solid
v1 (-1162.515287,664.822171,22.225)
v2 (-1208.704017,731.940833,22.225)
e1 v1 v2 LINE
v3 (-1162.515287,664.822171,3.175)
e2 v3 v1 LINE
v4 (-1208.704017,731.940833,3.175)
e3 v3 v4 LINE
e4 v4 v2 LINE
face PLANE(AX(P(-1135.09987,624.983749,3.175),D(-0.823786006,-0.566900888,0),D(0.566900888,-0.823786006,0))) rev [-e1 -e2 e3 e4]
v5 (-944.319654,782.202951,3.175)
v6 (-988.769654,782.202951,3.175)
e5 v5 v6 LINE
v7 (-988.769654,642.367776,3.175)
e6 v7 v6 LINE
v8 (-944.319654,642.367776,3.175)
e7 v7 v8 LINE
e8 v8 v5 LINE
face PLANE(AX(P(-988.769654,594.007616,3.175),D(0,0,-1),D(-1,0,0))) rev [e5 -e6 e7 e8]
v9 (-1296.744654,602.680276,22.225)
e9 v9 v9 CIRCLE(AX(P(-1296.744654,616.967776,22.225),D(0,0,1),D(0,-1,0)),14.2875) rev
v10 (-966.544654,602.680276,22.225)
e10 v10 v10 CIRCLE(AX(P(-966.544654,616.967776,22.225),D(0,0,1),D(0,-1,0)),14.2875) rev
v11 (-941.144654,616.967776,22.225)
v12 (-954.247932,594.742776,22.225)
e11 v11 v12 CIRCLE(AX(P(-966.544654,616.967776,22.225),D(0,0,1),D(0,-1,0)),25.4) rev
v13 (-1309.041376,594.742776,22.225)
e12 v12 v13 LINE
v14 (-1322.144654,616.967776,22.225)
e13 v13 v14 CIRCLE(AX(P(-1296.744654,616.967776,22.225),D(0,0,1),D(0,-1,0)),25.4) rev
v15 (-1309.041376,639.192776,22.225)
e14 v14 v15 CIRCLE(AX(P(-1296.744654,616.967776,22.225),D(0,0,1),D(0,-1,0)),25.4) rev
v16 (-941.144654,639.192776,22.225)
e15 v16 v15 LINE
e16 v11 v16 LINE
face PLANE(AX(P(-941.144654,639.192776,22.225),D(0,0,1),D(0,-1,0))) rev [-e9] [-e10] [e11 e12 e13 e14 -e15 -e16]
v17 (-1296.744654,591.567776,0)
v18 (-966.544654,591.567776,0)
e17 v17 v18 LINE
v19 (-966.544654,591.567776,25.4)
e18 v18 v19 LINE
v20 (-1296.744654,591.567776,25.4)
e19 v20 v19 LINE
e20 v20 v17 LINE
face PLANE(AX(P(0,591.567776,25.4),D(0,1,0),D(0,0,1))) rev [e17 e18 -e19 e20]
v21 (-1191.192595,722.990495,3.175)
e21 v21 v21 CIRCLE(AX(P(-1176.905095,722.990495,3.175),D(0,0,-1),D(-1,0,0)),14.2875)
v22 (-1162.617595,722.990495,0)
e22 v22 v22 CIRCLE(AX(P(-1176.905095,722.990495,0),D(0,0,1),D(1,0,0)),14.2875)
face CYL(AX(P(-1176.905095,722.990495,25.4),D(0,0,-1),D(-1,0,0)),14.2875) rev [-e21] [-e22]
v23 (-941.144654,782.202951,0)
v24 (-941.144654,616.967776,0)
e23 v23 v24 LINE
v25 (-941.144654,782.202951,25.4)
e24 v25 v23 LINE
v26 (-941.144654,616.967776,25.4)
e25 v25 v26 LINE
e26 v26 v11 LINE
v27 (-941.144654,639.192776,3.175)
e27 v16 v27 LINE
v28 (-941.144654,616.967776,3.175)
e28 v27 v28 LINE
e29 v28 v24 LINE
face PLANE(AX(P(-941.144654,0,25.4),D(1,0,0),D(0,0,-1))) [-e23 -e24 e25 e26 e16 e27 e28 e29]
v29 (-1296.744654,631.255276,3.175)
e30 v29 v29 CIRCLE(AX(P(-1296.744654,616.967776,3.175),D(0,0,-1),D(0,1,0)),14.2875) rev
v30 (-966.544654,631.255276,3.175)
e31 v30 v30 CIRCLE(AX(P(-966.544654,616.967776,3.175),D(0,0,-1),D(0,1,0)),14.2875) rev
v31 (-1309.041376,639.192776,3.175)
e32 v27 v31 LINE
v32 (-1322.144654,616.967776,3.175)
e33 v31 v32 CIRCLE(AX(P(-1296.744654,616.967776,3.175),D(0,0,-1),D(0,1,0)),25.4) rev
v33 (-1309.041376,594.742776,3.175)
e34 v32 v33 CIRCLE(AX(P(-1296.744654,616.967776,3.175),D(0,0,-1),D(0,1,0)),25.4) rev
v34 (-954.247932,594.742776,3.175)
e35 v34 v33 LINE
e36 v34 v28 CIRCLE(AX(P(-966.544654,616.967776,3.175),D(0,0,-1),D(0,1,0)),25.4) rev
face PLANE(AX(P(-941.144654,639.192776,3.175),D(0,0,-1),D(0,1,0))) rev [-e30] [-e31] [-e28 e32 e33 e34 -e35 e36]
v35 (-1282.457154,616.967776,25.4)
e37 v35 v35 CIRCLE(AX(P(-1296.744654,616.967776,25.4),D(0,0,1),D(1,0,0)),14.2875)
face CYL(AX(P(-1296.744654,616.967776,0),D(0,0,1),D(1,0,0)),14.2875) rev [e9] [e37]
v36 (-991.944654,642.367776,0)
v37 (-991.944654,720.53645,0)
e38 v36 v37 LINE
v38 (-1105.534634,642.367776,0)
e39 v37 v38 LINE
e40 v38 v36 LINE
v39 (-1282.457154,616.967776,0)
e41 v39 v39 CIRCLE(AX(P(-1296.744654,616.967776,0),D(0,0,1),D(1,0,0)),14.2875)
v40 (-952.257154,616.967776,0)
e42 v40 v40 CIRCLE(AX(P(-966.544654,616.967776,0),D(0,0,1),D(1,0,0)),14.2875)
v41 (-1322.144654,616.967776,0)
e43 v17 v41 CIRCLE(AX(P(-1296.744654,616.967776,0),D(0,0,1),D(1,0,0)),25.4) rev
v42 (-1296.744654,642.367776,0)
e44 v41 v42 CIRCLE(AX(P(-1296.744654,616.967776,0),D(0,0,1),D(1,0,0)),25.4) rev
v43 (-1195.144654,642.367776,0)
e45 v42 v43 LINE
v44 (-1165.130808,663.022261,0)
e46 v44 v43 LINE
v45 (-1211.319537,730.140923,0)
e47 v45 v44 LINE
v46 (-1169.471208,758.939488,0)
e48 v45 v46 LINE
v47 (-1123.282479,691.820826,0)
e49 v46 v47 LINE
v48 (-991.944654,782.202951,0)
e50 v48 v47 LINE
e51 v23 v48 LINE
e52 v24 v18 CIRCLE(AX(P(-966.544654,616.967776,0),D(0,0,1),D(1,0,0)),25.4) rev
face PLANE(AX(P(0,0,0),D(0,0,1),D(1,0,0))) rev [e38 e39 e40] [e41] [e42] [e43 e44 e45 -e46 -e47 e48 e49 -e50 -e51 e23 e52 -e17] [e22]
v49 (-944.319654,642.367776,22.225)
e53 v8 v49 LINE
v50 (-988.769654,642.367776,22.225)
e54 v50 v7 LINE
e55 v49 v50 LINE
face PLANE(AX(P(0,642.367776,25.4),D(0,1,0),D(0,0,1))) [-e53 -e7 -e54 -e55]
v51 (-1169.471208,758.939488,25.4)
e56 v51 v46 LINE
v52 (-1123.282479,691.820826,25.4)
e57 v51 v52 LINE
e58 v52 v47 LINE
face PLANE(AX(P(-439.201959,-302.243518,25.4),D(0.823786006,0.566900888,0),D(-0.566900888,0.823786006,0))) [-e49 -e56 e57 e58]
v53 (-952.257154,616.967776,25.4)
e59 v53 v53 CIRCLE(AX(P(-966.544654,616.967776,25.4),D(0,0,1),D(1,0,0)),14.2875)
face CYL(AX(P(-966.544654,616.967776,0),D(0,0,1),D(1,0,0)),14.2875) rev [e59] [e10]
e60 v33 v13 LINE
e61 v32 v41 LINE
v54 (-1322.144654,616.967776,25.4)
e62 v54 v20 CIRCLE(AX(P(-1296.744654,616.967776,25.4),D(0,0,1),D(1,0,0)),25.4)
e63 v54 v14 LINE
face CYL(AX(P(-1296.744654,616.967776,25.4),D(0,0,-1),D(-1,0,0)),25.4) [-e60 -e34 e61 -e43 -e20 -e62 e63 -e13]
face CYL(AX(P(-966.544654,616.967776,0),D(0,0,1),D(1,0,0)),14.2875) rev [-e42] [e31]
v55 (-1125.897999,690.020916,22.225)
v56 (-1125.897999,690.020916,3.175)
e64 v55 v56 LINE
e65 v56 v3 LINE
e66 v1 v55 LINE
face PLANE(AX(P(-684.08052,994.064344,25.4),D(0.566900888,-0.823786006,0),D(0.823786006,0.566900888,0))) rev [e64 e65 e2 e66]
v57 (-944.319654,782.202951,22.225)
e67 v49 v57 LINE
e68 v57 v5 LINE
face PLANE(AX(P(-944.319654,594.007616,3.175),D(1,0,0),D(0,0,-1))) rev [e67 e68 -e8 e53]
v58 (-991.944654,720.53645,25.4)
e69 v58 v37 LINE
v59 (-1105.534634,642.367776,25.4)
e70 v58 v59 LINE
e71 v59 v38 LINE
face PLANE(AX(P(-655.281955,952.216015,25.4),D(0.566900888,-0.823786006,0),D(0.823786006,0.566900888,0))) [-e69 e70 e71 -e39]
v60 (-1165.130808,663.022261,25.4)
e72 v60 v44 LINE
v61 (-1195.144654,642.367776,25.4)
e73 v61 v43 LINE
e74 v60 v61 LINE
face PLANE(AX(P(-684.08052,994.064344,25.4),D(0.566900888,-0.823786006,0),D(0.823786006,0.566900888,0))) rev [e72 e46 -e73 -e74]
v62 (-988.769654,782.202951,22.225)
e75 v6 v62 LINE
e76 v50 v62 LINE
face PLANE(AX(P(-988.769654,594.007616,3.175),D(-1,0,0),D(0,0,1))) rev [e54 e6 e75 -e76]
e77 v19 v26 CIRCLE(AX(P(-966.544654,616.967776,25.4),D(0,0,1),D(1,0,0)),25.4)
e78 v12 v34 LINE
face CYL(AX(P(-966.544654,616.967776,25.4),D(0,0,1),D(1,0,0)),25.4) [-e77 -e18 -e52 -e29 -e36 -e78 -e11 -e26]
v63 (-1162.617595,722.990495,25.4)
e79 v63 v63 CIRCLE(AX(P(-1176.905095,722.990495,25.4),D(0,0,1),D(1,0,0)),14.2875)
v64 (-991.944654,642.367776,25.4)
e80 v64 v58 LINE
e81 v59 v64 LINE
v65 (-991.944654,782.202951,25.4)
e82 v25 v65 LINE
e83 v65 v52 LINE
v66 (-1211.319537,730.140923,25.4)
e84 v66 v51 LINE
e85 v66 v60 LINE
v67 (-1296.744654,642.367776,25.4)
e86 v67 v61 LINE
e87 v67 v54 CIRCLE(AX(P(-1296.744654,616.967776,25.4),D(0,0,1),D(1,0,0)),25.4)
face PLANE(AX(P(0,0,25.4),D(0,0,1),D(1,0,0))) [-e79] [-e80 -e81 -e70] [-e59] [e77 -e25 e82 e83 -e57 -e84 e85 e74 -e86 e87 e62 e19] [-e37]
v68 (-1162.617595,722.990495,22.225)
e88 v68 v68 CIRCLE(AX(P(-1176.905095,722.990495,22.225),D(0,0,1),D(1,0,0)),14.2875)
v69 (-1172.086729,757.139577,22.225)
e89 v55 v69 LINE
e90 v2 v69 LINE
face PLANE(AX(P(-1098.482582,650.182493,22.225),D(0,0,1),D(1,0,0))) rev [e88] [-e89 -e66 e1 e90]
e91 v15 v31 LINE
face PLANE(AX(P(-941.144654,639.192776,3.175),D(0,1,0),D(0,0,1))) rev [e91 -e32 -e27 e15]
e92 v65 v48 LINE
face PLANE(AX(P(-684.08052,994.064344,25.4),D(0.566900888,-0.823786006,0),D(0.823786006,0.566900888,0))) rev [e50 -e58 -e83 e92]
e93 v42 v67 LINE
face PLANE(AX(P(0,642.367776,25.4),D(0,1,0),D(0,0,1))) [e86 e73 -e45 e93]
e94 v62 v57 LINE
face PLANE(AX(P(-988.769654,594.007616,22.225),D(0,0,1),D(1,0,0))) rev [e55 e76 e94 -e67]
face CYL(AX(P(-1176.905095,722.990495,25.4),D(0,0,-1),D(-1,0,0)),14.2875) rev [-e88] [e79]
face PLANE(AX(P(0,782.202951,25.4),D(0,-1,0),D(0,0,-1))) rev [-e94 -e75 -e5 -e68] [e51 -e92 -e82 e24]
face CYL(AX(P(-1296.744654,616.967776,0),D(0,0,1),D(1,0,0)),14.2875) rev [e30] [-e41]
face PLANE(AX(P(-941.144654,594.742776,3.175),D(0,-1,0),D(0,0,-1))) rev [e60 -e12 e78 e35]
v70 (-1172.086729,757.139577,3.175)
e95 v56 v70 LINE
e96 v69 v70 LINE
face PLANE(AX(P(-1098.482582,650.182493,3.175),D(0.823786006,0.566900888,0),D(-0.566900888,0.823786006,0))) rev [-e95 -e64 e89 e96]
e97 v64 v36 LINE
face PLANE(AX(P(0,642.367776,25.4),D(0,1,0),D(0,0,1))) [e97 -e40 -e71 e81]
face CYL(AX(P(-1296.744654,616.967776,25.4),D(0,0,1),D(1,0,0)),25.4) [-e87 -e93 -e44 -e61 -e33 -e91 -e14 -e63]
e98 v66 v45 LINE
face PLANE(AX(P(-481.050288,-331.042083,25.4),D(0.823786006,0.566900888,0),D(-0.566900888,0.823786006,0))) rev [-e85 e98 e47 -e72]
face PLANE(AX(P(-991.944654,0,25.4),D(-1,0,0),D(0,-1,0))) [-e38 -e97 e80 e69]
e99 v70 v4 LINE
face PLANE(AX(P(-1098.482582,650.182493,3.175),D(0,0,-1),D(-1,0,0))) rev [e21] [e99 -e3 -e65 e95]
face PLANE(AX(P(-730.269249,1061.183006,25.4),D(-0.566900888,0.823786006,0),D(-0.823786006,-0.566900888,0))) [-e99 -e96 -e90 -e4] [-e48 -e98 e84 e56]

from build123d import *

# Parameters (mm, degrees)
SKETCH1_R           = 14.2875
SKETCH1_R_2         = 25.4
BOSS_EXTRUDE3_DEPTH = 25.4
SKETCH9_R           = 14.2875
CUT_EXTRUDE7_DEPTH  = 1537.409158581
SKETCH10_W          = 19.05
SKETCH10_H          = 44.45
CUT_EXTRUDE8_DEPTH  = 871.429558372
SKETCH11_W          = 44.45
SKETCH11_H          = 19.05
CUT_EXTRUDE9_DEPTH  = 139.835175171
SKETCH13_R          = 14.2875
BOSS_EXTRUDE4_DEPTH = 25.4
SKETCH14_W          = 44.45
SKETCH14_H          = 19.05
CUT_EXTRUDE10_DEPTH = 81.475845846
FILLET3_R           = 25.4


with BuildPart() as part:
    # Sketch1 → Boss-Extrude3 (new body)
    # profile 1 of 13: a face of its own
    with BuildSketch(Plane.XY):
        with BuildLine():
            ThreePointArc((-1322.144654144, 616.967775532), (-1314.705166386, 634.928287774), (-1296.744654144, 642.367775532))
            Line((-1296.744654144, 642.367775532), (-1322.144654144, 642.367775532))
            Line((-1322.144654144, 642.367775532), (-1322.144654144, 616.967775532))
        make_face()
    # profile 2 of 13: a face of its own
    with BuildSketch(Plane.XY):
        with BuildLine():
            ThreePointArc((-1296.744654144, 591.567775532), (-1314.705166386, 599.00726329), (-1322.144654144, 616.967775532))
            Line((-1322.144654144, 616.967775532), (-1322.144654144, 591.567775532))
            Line((-1322.144654144, 591.567775532), (-1296.744654144, 591.567775532))
        make_face()
    # profile 3 of 13: a face of its own
    with BuildSketch(Plane.XY):
        with BuildLine():
            ThreePointArc((-1258.644654144, 616.967775532), (-1261.152687268, 630.562697152), (-1268.34659083, 642.367775532))
            Line((-1268.34659083, 642.367775532), (-1296.744654144, 642.367775532))
            ThreePointArc((-1296.744654144, 642.367775532), (-1278.784141902, 634.928287774), (-1271.344654144, 616.967775532))
            ThreePointArc((-1271.344654144, 616.967775532), (-1278.784141902, 599.00726329), (-1296.744654144, 591.567775532))
            Line((-1296.744654144, 591.567775532), (-1268.34659083, 591.567775532))
            ThreePointArc((-1268.34659083, 591.567775532), (-1261.152687268, 603.372853911), (-1258.644654144, 616.967775532))
        make_face()
    # profile 4 of 13: a face of its own
    with BuildSketch(Plane.XY):
        with BuildLine():
            Line((-1166.346089039, 600.519446439), (-1195.144654144, 642.367775532))
            Line((-1195.144654144, 642.367775532), (-1268.34659083, 642.367775532))
            ThreePointArc((-1268.34659083, 642.367775532), (-1261.152687268, 630.562697152), (-1258.644654144, 616.967775532))
            ThreePointArc((-1258.644654144, 616.967775532), (-1261.152687268, 603.372853911), (-1268.34659083, 591.567775532))
            Line((-1268.34659083, 591.567775532), (-1128.284013271, 591.567775532))
            Line((-1128.284013271, 591.567775532), (-1128.284013271, 626.712443646))
            Line((-1128.284013271, 626.712443646), (-1166.346089039, 600.519446439))
        make_face()
    # profile 5 of 13: a face of its own
    with BuildSketch(Plane.XY):
        Polygon((-1128.284013271, 642.367775532), (-1195.144654144, 642.367775532), (-1166.346089039, 600.519446439), (-1128.284013271, 626.712443646), align=None)
    # profile 6 of 13: a face of its own
    with BuildSketch(Plane.XY):
        Polygon((-991.944654144, 720.536450369), (-991.944654144, 782.202950703), (-1195.144654144, 642.367775532), (-1128.284013271, 642.367775532), (-1105.534633972, 642.367775532), align=None)
    # profile 7 of 13: a face of its own
    with BuildSketch(Plane.XY):
        Polygon((-1105.534633972, 642.367775532), (-1128.284013271, 642.367775532), (-1128.284013271, 626.712443646), align=None)
    # profile 8 of 13: a face of its own
    with BuildSketch(Plane.XY):
        Polygon((-941.144654144, 591.567775532), (-941.144654144, 642.367775532), (-991.944654144, 642.367775532), (-1105.534633972, 642.367775532), (-1128.284013271, 626.712443646), (-1128.284013271, 591.567775532), align=None)
        with Locations((-966.544654144, 616.967775532)):
            Circle(SKETCH1_R, mode=Mode.SUBTRACT)
    # profile 9 of 13: a face of its own
    with BuildSketch(Plane.XY):
        Polygon((-941.144654144, 782.202950703), (-991.944654144, 782.202950703), (-963.146089039, 740.354621609), (-991.944654144, 720.536450369), (-991.944654144, 642.367775532), (-941.144654144, 642.367775532), align=None)
    # profile 10 of 13: a face of its own
    with BuildSketch(Plane.XY):
        Polygon((-963.146089039, 740.354621609), (-991.944654144, 782.202950703), (-991.944654144, 720.536450369), align=None)
    # profile 11 of 13: a face of its own
    with BuildSketch(Plane.XY):
        with Locations((-966.544654144, 616.967775532)):
            Circle(SKETCH1_R)
    # profile 12 of 13: a face of its own
    with BuildSketch(Plane.XY):
        with Locations((-1296.744654144, 616.967775532)):
            Circle(SKETCH1_R_2)
        with Locations((-1296.744654144, 616.967775532)):
            Circle(SKETCH1_R, mode=Mode.SUBTRACT)
    # profile 13 of 13: a face of its own
    with BuildSketch(Plane.XY):
        with Locations((-1296.744654144, 616.967775532)):
            Circle(SKETCH1_R)
    extrude(amount=BOSS_EXTRUDE3_DEPTH)

    # Sketch9 → Cut-Extrude7 (cut, through all)
    with BuildSketch(Plane.XY.offset(25.4)):
        with Locations((-1296.744654144, 616.967775532)):
            Circle(SKETCH9_R)
        with Locations((-966.544654144, 616.967775532)):
            Circle(SKETCH9_R)
    extrude(amount=-CUT_EXTRUDE7_DEPTH, mode=Mode.SUBTRACT)

    # Sketch10 → Cut-Extrude8 (cut, through all)
    with BuildSketch(Plane.ZY.offset(1322.144654144)):
        with Locations((12.7, 616.967775532)):
            Rectangle(SKETCH10_W, SKETCH10_H)
    extrude(amount=-CUT_EXTRUDE8_DEPTH, mode=Mode.SUBTRACT)

    # Sketch11 → Cut-Extrude9 (cut)
    with BuildSketch(Plane(origin=(0, 782.202950703, 0), x_dir=(1, 0, 0), z_dir=(0, 1, 0))):
        with Locations((-966.544654144, -12.7)):
            Rectangle(SKETCH11_W, SKETCH11_H)
    extrude(amount=-CUT_EXTRUDE9_DEPTH, mode=Mode.SUBTRACT)

    # Sketch13 → Boss-Extrude4 (add)
    # profile 1 of 2: a face of its own
    with BuildSketch(Plane.XY):
        with BuildLine():
            Line((-1169.471208218, 758.939487681), (-1211.319537311, 730.140922576))
            Line((-1211.319537311, 730.140922576), (-1180.283016907, 685.040532503))
            ThreePointArc((-1180.283016907, 685.040532503), (-1154.1022052, 692.46774594), (-1139.555223473, 715.467392104))
            Line((-1139.555223473, 715.467392104), (-1169.471208218, 758.939487681))
        make_face()
        with Locations((-1176.905095286, 722.990494894)):
            Circle(SKETCH13_R, mode=Mode.SUBTRACT)
    # profile 2 of 2: a face of its own
    with BuildSketch(Plane.XY):
        with BuildLine():
            ThreePointArc((-1139.555223473, 715.467392104), (-1154.1022052, 692.46774594), (-1180.283016907, 685.040532503))
            Line((-1180.283016907, 685.040532503), (-1165.130807959, 663.022260959))
            Line((-1165.130807959, 663.022260959), (-1123.282478866, 691.820826065))
            Line((-1123.282478866, 691.820826065), (-1139.555223473, 715.467392104))
        make_face()
    extrude(amount=BOSS_EXTRUDE4_DEPTH)

    # Sketch14 → Cut-Extrude10 (cut)
    with BuildSketch(Plane(origin=(-730.269249407, 1061.183005622, 0), x_dir=(0.8237860057708082, 0.5669008878950341, 0), z_dir=(-0.5669008878950341, 0.8237860057708082, 0))):
        with Locations((-558.550546057, -12.7)):
            Rectangle(SKETCH14_W, SKETCH14_H)
    extrude(amount=-CUT_EXTRUDE10_DEPTH, mode=Mode.SUBTRACT)

    # Fillet3
    # the kernel refuses this fillet: 25.4 mm, written as the material it takes off along each edge
    with BuildSketch(Plane(origin=(-941.144654144, 591.567775532, -63.5), x_dir=(-1, 0, 0), z_dir=(0, 0, 1)), Plane(origin=(-1322.144654144, 591.567775532, -63.5), x_dir=(0, 1, 0), z_dir=(0, 0, 1)), Plane(origin=(-1322.144654144, 642.367775532, -63.5), x_dir=(1, 0, 0), z_dir=(0, 0, 1))) as fillet3_piece_1:
        with BuildLine():
            CenterArc((FILLET3_R, -FILLET3_R), FILLET3_R, 90, 90)
            Line((0, -FILLET3_R), (0, 0))
            Line((0, 0), (FILLET3_R, 0))
        make_face()
    extrude(amount=152.4, mode=Mode.SUBTRACT)


solid = part.part
